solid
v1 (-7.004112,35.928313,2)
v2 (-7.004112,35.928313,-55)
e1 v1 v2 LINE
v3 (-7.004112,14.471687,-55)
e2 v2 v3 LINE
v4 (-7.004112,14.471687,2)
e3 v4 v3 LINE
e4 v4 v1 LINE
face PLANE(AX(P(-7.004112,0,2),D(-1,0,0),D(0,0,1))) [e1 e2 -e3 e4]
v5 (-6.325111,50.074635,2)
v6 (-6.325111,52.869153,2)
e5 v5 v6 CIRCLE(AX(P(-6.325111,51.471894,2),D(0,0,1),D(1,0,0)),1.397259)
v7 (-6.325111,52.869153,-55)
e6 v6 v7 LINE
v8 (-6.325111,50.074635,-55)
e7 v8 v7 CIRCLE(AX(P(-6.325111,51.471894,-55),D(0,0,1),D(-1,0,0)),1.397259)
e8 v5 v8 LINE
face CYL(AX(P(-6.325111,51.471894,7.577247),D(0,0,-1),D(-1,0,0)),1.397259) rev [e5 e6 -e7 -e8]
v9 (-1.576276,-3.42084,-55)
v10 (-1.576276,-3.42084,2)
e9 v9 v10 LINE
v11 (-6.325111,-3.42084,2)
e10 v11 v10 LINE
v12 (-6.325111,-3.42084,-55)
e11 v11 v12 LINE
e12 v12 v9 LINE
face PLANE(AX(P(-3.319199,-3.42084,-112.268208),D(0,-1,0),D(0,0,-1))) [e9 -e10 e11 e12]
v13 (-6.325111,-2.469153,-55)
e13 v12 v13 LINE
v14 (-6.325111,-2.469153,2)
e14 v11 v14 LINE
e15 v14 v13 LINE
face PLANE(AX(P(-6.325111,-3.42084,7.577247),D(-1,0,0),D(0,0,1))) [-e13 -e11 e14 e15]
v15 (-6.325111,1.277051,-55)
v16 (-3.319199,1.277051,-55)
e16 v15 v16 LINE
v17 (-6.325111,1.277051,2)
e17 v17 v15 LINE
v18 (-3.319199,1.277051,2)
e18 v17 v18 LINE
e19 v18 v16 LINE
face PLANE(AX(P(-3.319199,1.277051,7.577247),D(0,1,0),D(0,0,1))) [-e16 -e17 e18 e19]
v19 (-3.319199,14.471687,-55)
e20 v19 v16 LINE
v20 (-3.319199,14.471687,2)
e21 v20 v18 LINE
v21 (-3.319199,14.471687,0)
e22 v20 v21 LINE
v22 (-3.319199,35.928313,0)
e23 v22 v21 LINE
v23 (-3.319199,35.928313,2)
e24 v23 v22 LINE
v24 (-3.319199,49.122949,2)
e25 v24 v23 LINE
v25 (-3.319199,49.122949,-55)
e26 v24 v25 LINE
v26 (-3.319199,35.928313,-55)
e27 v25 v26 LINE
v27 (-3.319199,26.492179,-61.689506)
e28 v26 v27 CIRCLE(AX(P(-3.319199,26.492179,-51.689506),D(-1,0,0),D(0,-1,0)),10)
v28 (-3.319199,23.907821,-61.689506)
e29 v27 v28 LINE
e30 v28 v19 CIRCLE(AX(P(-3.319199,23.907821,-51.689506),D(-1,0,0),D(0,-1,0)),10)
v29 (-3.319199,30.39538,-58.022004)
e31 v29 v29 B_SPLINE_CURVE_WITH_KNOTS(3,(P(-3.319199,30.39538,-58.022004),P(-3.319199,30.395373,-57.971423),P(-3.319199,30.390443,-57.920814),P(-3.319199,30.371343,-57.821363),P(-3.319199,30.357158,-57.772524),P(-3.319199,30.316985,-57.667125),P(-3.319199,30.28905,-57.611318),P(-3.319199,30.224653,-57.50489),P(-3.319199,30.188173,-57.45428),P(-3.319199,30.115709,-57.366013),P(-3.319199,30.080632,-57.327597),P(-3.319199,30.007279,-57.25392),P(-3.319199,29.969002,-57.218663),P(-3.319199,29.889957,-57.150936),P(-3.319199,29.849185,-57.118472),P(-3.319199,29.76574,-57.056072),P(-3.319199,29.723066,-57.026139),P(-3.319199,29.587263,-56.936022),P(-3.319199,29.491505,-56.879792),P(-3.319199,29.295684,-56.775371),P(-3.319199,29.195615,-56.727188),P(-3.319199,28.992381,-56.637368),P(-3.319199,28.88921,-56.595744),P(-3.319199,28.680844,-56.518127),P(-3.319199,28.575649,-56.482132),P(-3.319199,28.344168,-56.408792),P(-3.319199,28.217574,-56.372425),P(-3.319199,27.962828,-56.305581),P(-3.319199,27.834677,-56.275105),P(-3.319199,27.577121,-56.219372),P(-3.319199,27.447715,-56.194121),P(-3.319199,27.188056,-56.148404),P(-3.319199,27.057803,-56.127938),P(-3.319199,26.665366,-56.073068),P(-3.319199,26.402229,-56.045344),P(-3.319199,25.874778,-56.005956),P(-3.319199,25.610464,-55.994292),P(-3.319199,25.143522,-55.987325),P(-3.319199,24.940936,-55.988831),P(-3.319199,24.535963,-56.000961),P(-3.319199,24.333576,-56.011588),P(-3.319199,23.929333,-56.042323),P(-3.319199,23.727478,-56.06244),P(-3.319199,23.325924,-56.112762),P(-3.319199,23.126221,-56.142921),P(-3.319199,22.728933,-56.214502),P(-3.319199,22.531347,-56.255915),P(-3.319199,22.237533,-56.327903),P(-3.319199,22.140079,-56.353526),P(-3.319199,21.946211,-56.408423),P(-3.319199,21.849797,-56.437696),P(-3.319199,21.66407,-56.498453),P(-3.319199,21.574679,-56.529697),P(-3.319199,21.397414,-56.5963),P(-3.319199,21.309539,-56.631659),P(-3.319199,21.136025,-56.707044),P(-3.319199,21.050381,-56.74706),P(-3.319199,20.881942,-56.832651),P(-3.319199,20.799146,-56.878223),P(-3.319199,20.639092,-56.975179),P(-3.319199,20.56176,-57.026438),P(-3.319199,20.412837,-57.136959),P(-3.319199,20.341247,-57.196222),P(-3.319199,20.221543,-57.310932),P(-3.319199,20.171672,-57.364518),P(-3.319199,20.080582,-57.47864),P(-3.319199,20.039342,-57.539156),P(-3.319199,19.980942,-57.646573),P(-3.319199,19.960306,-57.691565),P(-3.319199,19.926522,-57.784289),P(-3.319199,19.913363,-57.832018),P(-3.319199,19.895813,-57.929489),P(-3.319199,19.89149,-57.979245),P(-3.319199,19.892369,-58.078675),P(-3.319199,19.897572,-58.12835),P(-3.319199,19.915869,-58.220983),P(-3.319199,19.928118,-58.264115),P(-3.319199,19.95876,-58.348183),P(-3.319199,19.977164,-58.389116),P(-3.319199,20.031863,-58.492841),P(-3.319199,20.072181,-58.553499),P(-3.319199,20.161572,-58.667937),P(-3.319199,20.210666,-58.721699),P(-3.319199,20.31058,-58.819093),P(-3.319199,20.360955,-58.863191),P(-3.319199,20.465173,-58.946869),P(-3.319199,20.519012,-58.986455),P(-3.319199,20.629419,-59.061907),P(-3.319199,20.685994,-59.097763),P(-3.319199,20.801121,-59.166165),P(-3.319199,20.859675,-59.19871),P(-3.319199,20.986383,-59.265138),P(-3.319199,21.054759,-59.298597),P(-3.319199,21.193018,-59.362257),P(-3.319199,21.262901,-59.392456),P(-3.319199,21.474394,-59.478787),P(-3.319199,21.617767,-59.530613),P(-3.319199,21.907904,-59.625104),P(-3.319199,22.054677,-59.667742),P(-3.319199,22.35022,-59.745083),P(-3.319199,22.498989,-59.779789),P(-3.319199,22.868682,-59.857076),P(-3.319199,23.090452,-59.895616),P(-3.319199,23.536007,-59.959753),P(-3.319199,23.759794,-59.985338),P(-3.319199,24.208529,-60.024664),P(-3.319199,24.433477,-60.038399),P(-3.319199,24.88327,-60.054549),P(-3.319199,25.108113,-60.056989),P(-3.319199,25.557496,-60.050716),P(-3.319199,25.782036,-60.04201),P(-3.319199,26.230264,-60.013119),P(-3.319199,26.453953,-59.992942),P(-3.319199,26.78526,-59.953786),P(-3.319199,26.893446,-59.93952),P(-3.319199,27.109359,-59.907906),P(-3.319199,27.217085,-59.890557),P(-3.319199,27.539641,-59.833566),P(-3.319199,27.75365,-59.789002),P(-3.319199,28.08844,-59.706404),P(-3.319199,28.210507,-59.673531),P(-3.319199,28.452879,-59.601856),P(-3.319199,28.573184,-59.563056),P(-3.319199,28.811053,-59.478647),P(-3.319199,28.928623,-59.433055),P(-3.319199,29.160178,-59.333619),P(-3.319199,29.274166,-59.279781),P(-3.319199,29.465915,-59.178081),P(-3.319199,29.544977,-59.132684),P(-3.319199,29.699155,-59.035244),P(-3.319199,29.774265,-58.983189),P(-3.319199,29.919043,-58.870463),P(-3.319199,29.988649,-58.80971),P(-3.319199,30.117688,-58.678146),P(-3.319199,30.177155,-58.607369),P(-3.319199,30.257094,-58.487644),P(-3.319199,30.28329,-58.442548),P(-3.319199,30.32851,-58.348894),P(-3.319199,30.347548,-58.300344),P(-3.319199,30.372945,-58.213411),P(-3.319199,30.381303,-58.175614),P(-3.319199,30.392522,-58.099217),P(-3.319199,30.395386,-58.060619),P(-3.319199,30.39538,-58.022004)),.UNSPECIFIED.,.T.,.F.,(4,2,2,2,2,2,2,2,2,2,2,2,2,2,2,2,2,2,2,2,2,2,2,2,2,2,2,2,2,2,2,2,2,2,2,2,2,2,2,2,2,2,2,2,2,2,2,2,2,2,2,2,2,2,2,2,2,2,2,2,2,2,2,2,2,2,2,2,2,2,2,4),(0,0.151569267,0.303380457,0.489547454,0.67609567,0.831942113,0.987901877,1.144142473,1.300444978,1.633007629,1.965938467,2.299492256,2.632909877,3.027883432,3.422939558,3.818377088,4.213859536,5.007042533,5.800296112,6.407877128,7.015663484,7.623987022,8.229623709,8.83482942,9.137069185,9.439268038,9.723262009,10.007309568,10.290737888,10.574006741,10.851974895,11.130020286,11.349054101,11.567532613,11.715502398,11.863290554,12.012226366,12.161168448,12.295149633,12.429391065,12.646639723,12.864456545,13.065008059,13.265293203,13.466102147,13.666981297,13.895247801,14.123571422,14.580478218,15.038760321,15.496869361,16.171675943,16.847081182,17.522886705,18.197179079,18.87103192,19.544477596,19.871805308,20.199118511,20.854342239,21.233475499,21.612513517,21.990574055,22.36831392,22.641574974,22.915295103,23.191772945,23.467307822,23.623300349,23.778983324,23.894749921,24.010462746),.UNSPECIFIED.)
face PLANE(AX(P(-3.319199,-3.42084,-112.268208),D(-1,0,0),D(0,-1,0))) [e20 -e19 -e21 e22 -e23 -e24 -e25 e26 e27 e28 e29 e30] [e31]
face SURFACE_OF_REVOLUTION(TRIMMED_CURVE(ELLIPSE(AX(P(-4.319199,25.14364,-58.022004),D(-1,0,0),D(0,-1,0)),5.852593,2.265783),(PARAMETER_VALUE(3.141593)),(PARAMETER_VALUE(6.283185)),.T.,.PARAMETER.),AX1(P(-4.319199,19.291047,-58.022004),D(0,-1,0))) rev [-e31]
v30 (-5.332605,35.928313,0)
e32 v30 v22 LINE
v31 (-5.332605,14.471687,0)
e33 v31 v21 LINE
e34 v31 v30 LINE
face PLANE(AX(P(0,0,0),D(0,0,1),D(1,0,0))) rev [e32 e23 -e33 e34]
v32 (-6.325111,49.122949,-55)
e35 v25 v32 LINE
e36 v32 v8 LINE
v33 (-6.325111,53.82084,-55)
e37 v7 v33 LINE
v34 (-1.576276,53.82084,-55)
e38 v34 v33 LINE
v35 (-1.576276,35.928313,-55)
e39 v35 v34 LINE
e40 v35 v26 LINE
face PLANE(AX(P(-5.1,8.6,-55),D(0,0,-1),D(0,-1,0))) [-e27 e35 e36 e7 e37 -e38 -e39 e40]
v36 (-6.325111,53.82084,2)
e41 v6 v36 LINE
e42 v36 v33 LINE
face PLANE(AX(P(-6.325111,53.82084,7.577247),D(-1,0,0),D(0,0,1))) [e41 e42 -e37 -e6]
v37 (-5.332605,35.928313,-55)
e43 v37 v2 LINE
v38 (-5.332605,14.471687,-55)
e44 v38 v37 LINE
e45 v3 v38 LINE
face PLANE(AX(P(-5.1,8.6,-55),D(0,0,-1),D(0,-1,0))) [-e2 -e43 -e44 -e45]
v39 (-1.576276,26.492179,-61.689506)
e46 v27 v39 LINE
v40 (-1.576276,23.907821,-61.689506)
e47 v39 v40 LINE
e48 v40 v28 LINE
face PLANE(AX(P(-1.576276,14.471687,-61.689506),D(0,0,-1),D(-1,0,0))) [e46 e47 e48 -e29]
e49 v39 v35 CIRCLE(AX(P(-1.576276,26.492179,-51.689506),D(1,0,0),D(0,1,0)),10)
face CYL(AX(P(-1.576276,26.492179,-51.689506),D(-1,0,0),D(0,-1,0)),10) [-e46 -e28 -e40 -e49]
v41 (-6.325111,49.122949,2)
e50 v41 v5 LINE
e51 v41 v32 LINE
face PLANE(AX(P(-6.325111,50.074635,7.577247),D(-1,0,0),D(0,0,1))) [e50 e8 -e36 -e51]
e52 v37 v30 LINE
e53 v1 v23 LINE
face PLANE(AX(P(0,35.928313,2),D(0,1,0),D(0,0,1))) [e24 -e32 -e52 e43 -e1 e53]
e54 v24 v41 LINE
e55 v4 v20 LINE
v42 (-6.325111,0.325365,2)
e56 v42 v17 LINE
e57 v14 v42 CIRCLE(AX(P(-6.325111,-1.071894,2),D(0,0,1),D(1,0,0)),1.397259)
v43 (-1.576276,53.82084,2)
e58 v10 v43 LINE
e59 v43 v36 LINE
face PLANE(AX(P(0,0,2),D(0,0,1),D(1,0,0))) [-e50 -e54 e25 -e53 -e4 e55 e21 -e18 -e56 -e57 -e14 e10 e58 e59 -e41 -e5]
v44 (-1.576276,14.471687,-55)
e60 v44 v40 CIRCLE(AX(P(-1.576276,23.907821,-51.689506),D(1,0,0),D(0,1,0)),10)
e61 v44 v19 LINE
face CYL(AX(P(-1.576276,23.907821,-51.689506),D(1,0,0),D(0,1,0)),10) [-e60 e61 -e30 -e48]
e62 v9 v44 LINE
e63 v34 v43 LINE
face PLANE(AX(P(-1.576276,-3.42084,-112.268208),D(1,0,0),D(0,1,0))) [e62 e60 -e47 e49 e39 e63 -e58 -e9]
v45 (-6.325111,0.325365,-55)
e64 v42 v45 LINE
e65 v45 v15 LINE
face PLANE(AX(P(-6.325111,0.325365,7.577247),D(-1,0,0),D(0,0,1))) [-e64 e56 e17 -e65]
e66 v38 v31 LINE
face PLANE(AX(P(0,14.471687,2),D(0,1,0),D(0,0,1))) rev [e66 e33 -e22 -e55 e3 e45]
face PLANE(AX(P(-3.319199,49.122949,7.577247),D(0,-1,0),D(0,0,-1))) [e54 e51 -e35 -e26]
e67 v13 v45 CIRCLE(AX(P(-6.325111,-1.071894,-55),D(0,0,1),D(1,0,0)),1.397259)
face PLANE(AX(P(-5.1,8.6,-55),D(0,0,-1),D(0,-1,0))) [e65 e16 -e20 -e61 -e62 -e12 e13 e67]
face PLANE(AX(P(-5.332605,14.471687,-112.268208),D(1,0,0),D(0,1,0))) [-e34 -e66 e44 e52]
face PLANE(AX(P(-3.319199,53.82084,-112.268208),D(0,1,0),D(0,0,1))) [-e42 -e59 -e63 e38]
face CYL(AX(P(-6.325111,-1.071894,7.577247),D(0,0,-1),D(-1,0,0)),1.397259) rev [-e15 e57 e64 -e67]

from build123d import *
from build123d.topology import SkipClean

# Parameters (mm, degrees)
CROQUIS1_W                = 1.742923262
CROQUIS1_H                = 57.241679132
SALIENTE_EXTRUIR1_DEPTH   = 55
CROQUIS1_W_2              = 1.671507147
CROQUIS1_H_2              = 21.456626134
SALIENTE_EXTRUIR1_2_DEPTH = 55
CROQUIS2_W                = 3.684913484
CROQUIS2_H                = 21.456626134
SALIENTE_EXTRUIR2_DEPTH   = 2
CROQUIS3_W                = 6.689505602
CROQUIS3_H                = 21.456626134
SALIENTE_EXTRUIR3_DEPTH   = 1.742923
REDONDEO1_R               = 10
SALIENTE_EXTRUIR4_DEPTH   = 57


with BuildPart() as part:
    # Croquis1 → Saliente-Extruir1 (new body)
    with BuildSketch(Plane.XY):
        with Locations((-2.447737274, 25.2)):
            Rectangle(CROQUIS1_W, CROQUIS1_H)
    extrude(amount=-SALIENTE_EXTRUIR1_DEPTH)



with BuildPart() as body_2:
    # Croquis1 → Saliente-Extruir1 2 (new body)
    with BuildSketch(Plane.XY):
        with Locations((-6.168358816, 25.2)):
            Rectangle(CROQUIS1_W_2, CROQUIS1_H_2)
    extrude(amount=-SALIENTE_EXTRUIR1_2_DEPTH)


with BuildPart() as part_1:
    add(part.part)

    add(body_2.part)  # Saliente-Extruir2 merges body 2
    # Croquis2 → Saliente-Extruir2 (add)
    with BuildSketch(Plane.XY):
        with Locations((-5.161655647, 25.2)):
            Rectangle(CROQUIS2_W, CROQUIS2_H)
        Polygon((-3.319198905, 53.820839566), (-3.319198905, 35.928313067), (-3.319198905, 14.471686933), (-3.319198905, -3.420839566), (-1.576275643, -3.420839566), (-1.576275643, 14.471686933), (-1.576275643, 35.928313067), (-1.576275643, 53.820839566), align=None)
    extrude(amount=SALIENTE_EXTRUIR2_DEPTH)

    # Croquis3 → Saliente-Extruir3 (add, through all)
    with SkipClean():  # the faces are left unmerged after this step: merging them gives an invalid solid
        with BuildSketch(Plane.ZY.offset(3.319198905)):
            with Locations((-58.344752801, 25.2)):
                Rectangle(CROQUIS3_W, CROQUIS3_H)
        extrude(amount=-SALIENTE_EXTRUIR3_DEPTH)

    # Redondeo1
    # the kernel refuses this fillet: 10 mm, written as the material it takes off along each edge
    with BuildSketch(Plane(origin=(-26.909534167, 14.471686933, -61.689505602), x_dir=(0, 0, 1), z_dir=(1, 0, 0))) as redondeo1_piece_1:
        with BuildLine():
            CenterArc((10, -9.436134105), REDONDEO1_R, 109.332484587, 70.667515413)
            Line((0, -9.436134105), (-0.2, -9.436134105))
            Line((-0.2, -9.436134105), (-0.2, 0))
            Line((-0.2, 0), (0, 0.2))
            ThreePointArc((0, 0.2), (3.344752801, 0.2), (6.623295714, 0.188722682))
            Line((6.623295714, 0.188722682), (6.689505602, 0))
        make_face()
    extrude(amount=48.923593524, mode=Mode.SUBTRACT)
    with BuildSketch(Plane(origin=(-26.909534167, 35.928313067, -61.689505602), x_dir=(0, -1, 0), z_dir=(1, 0, 0))) as redondeo1_piece_2:
        with BuildLine():
            CenterArc((9.436134105, -10), REDONDEO1_R, 90, 70.667515413)
            Line((0, -6.689505602), (-0.188722682, -6.623295714))
            ThreePointArc((-0.188722682, -6.623295714), (-0.2, -3.344752801), (-0.2, 0))
            Line((-0.2, 0), (0, 0.2))
            Line((0, 0.2), (9.436134105, 0.2))
            Line((9.436134105, 0.2), (9.436134105, 0))
        make_face()
    extrude(amount=48.923593524, mode=Mode.SUBTRACT)

    # Croquis6 → Cortar-Revolución4 (revolve, cut)
    with SkipClean():  # the faces are left unmerged after this step: merging them gives an invalid solid
        with BuildSketch(Plane.ZY.offset(4.319198905)):
            with BuildLine():
                Line((-58.022003986, 30.9962324), (-58.022003986, 19.291046994))
                add(Edge.make_bspline(
                    [(-58.022003986, 30.9962324), (-60.287786898, 30.9962324), (-60.287786898, 25.143639697), (-60.287786898, 19.291046994), (-58.022003986, 19.291046994)],
                    knots=[3.141592654, 3.141592654, 3.141592654, 4.71238898, 4.71238898, 6.283185307, 6.283185307, 6.283185307], degree=2, weights=[1, 0.707106781, 1, 0.707106781, 1]))
            make_face()
        revolve(axis=Axis((-4.319198905, 19.291046994, -58.022003986), (0, 1, 0)), mode=Mode.SUBTRACT)

    # Croquis7 → Saliente-Extruir4 (add)
    with SkipClean():  # the faces are left unmerged after this step: merging them gives an invalid solid
        with BuildSketch(Plane(origin=(0, 0, -55), x_dir=(-1, 0, 0), z_dir=(0, 0, -1))):
            with BuildLine():
                Line((6.325110646, 50.074635433), (6.325110646, 49.12294906))
                Line((6.325110646, 49.12294906), (3.319198905, 49.12294906))
                Line((3.319198905, 49.12294906), (3.319198905, 53.820839566))
                Line((3.319198905, 53.820839566), (6.325110646, 53.820839566))
                Line((6.325110646, 53.820839566), (6.325110646, 52.869153193))
                ThreePointArc((6.325110646, 52.869153193), (4.927851766, 51.471894313), (6.325110646, 50.074635433))
            make_face()
            with BuildLine():
                Line((6.325110646, -3.420839566), (6.325110646, -2.469153193))
                ThreePointArc((6.325110646, -2.469153193), (4.927851766, -1.071894313), (6.325110646, 0.325364567))
                Line((6.325110646, 0.325364567), (6.325110646, 1.27705094))
                Line((6.325110646, 1.27705094), (3.319198905, 1.27705094))
                Line((3.319198905, 1.27705094), (3.319198905, -3.420839566))
                Line((3.319198905, -3.420839566), (6.325110646, -3.420839566))
            make_face()
        extrude(amount=-SALIENTE_EXTRUIR4_DEPTH)


solid = part_1.part
